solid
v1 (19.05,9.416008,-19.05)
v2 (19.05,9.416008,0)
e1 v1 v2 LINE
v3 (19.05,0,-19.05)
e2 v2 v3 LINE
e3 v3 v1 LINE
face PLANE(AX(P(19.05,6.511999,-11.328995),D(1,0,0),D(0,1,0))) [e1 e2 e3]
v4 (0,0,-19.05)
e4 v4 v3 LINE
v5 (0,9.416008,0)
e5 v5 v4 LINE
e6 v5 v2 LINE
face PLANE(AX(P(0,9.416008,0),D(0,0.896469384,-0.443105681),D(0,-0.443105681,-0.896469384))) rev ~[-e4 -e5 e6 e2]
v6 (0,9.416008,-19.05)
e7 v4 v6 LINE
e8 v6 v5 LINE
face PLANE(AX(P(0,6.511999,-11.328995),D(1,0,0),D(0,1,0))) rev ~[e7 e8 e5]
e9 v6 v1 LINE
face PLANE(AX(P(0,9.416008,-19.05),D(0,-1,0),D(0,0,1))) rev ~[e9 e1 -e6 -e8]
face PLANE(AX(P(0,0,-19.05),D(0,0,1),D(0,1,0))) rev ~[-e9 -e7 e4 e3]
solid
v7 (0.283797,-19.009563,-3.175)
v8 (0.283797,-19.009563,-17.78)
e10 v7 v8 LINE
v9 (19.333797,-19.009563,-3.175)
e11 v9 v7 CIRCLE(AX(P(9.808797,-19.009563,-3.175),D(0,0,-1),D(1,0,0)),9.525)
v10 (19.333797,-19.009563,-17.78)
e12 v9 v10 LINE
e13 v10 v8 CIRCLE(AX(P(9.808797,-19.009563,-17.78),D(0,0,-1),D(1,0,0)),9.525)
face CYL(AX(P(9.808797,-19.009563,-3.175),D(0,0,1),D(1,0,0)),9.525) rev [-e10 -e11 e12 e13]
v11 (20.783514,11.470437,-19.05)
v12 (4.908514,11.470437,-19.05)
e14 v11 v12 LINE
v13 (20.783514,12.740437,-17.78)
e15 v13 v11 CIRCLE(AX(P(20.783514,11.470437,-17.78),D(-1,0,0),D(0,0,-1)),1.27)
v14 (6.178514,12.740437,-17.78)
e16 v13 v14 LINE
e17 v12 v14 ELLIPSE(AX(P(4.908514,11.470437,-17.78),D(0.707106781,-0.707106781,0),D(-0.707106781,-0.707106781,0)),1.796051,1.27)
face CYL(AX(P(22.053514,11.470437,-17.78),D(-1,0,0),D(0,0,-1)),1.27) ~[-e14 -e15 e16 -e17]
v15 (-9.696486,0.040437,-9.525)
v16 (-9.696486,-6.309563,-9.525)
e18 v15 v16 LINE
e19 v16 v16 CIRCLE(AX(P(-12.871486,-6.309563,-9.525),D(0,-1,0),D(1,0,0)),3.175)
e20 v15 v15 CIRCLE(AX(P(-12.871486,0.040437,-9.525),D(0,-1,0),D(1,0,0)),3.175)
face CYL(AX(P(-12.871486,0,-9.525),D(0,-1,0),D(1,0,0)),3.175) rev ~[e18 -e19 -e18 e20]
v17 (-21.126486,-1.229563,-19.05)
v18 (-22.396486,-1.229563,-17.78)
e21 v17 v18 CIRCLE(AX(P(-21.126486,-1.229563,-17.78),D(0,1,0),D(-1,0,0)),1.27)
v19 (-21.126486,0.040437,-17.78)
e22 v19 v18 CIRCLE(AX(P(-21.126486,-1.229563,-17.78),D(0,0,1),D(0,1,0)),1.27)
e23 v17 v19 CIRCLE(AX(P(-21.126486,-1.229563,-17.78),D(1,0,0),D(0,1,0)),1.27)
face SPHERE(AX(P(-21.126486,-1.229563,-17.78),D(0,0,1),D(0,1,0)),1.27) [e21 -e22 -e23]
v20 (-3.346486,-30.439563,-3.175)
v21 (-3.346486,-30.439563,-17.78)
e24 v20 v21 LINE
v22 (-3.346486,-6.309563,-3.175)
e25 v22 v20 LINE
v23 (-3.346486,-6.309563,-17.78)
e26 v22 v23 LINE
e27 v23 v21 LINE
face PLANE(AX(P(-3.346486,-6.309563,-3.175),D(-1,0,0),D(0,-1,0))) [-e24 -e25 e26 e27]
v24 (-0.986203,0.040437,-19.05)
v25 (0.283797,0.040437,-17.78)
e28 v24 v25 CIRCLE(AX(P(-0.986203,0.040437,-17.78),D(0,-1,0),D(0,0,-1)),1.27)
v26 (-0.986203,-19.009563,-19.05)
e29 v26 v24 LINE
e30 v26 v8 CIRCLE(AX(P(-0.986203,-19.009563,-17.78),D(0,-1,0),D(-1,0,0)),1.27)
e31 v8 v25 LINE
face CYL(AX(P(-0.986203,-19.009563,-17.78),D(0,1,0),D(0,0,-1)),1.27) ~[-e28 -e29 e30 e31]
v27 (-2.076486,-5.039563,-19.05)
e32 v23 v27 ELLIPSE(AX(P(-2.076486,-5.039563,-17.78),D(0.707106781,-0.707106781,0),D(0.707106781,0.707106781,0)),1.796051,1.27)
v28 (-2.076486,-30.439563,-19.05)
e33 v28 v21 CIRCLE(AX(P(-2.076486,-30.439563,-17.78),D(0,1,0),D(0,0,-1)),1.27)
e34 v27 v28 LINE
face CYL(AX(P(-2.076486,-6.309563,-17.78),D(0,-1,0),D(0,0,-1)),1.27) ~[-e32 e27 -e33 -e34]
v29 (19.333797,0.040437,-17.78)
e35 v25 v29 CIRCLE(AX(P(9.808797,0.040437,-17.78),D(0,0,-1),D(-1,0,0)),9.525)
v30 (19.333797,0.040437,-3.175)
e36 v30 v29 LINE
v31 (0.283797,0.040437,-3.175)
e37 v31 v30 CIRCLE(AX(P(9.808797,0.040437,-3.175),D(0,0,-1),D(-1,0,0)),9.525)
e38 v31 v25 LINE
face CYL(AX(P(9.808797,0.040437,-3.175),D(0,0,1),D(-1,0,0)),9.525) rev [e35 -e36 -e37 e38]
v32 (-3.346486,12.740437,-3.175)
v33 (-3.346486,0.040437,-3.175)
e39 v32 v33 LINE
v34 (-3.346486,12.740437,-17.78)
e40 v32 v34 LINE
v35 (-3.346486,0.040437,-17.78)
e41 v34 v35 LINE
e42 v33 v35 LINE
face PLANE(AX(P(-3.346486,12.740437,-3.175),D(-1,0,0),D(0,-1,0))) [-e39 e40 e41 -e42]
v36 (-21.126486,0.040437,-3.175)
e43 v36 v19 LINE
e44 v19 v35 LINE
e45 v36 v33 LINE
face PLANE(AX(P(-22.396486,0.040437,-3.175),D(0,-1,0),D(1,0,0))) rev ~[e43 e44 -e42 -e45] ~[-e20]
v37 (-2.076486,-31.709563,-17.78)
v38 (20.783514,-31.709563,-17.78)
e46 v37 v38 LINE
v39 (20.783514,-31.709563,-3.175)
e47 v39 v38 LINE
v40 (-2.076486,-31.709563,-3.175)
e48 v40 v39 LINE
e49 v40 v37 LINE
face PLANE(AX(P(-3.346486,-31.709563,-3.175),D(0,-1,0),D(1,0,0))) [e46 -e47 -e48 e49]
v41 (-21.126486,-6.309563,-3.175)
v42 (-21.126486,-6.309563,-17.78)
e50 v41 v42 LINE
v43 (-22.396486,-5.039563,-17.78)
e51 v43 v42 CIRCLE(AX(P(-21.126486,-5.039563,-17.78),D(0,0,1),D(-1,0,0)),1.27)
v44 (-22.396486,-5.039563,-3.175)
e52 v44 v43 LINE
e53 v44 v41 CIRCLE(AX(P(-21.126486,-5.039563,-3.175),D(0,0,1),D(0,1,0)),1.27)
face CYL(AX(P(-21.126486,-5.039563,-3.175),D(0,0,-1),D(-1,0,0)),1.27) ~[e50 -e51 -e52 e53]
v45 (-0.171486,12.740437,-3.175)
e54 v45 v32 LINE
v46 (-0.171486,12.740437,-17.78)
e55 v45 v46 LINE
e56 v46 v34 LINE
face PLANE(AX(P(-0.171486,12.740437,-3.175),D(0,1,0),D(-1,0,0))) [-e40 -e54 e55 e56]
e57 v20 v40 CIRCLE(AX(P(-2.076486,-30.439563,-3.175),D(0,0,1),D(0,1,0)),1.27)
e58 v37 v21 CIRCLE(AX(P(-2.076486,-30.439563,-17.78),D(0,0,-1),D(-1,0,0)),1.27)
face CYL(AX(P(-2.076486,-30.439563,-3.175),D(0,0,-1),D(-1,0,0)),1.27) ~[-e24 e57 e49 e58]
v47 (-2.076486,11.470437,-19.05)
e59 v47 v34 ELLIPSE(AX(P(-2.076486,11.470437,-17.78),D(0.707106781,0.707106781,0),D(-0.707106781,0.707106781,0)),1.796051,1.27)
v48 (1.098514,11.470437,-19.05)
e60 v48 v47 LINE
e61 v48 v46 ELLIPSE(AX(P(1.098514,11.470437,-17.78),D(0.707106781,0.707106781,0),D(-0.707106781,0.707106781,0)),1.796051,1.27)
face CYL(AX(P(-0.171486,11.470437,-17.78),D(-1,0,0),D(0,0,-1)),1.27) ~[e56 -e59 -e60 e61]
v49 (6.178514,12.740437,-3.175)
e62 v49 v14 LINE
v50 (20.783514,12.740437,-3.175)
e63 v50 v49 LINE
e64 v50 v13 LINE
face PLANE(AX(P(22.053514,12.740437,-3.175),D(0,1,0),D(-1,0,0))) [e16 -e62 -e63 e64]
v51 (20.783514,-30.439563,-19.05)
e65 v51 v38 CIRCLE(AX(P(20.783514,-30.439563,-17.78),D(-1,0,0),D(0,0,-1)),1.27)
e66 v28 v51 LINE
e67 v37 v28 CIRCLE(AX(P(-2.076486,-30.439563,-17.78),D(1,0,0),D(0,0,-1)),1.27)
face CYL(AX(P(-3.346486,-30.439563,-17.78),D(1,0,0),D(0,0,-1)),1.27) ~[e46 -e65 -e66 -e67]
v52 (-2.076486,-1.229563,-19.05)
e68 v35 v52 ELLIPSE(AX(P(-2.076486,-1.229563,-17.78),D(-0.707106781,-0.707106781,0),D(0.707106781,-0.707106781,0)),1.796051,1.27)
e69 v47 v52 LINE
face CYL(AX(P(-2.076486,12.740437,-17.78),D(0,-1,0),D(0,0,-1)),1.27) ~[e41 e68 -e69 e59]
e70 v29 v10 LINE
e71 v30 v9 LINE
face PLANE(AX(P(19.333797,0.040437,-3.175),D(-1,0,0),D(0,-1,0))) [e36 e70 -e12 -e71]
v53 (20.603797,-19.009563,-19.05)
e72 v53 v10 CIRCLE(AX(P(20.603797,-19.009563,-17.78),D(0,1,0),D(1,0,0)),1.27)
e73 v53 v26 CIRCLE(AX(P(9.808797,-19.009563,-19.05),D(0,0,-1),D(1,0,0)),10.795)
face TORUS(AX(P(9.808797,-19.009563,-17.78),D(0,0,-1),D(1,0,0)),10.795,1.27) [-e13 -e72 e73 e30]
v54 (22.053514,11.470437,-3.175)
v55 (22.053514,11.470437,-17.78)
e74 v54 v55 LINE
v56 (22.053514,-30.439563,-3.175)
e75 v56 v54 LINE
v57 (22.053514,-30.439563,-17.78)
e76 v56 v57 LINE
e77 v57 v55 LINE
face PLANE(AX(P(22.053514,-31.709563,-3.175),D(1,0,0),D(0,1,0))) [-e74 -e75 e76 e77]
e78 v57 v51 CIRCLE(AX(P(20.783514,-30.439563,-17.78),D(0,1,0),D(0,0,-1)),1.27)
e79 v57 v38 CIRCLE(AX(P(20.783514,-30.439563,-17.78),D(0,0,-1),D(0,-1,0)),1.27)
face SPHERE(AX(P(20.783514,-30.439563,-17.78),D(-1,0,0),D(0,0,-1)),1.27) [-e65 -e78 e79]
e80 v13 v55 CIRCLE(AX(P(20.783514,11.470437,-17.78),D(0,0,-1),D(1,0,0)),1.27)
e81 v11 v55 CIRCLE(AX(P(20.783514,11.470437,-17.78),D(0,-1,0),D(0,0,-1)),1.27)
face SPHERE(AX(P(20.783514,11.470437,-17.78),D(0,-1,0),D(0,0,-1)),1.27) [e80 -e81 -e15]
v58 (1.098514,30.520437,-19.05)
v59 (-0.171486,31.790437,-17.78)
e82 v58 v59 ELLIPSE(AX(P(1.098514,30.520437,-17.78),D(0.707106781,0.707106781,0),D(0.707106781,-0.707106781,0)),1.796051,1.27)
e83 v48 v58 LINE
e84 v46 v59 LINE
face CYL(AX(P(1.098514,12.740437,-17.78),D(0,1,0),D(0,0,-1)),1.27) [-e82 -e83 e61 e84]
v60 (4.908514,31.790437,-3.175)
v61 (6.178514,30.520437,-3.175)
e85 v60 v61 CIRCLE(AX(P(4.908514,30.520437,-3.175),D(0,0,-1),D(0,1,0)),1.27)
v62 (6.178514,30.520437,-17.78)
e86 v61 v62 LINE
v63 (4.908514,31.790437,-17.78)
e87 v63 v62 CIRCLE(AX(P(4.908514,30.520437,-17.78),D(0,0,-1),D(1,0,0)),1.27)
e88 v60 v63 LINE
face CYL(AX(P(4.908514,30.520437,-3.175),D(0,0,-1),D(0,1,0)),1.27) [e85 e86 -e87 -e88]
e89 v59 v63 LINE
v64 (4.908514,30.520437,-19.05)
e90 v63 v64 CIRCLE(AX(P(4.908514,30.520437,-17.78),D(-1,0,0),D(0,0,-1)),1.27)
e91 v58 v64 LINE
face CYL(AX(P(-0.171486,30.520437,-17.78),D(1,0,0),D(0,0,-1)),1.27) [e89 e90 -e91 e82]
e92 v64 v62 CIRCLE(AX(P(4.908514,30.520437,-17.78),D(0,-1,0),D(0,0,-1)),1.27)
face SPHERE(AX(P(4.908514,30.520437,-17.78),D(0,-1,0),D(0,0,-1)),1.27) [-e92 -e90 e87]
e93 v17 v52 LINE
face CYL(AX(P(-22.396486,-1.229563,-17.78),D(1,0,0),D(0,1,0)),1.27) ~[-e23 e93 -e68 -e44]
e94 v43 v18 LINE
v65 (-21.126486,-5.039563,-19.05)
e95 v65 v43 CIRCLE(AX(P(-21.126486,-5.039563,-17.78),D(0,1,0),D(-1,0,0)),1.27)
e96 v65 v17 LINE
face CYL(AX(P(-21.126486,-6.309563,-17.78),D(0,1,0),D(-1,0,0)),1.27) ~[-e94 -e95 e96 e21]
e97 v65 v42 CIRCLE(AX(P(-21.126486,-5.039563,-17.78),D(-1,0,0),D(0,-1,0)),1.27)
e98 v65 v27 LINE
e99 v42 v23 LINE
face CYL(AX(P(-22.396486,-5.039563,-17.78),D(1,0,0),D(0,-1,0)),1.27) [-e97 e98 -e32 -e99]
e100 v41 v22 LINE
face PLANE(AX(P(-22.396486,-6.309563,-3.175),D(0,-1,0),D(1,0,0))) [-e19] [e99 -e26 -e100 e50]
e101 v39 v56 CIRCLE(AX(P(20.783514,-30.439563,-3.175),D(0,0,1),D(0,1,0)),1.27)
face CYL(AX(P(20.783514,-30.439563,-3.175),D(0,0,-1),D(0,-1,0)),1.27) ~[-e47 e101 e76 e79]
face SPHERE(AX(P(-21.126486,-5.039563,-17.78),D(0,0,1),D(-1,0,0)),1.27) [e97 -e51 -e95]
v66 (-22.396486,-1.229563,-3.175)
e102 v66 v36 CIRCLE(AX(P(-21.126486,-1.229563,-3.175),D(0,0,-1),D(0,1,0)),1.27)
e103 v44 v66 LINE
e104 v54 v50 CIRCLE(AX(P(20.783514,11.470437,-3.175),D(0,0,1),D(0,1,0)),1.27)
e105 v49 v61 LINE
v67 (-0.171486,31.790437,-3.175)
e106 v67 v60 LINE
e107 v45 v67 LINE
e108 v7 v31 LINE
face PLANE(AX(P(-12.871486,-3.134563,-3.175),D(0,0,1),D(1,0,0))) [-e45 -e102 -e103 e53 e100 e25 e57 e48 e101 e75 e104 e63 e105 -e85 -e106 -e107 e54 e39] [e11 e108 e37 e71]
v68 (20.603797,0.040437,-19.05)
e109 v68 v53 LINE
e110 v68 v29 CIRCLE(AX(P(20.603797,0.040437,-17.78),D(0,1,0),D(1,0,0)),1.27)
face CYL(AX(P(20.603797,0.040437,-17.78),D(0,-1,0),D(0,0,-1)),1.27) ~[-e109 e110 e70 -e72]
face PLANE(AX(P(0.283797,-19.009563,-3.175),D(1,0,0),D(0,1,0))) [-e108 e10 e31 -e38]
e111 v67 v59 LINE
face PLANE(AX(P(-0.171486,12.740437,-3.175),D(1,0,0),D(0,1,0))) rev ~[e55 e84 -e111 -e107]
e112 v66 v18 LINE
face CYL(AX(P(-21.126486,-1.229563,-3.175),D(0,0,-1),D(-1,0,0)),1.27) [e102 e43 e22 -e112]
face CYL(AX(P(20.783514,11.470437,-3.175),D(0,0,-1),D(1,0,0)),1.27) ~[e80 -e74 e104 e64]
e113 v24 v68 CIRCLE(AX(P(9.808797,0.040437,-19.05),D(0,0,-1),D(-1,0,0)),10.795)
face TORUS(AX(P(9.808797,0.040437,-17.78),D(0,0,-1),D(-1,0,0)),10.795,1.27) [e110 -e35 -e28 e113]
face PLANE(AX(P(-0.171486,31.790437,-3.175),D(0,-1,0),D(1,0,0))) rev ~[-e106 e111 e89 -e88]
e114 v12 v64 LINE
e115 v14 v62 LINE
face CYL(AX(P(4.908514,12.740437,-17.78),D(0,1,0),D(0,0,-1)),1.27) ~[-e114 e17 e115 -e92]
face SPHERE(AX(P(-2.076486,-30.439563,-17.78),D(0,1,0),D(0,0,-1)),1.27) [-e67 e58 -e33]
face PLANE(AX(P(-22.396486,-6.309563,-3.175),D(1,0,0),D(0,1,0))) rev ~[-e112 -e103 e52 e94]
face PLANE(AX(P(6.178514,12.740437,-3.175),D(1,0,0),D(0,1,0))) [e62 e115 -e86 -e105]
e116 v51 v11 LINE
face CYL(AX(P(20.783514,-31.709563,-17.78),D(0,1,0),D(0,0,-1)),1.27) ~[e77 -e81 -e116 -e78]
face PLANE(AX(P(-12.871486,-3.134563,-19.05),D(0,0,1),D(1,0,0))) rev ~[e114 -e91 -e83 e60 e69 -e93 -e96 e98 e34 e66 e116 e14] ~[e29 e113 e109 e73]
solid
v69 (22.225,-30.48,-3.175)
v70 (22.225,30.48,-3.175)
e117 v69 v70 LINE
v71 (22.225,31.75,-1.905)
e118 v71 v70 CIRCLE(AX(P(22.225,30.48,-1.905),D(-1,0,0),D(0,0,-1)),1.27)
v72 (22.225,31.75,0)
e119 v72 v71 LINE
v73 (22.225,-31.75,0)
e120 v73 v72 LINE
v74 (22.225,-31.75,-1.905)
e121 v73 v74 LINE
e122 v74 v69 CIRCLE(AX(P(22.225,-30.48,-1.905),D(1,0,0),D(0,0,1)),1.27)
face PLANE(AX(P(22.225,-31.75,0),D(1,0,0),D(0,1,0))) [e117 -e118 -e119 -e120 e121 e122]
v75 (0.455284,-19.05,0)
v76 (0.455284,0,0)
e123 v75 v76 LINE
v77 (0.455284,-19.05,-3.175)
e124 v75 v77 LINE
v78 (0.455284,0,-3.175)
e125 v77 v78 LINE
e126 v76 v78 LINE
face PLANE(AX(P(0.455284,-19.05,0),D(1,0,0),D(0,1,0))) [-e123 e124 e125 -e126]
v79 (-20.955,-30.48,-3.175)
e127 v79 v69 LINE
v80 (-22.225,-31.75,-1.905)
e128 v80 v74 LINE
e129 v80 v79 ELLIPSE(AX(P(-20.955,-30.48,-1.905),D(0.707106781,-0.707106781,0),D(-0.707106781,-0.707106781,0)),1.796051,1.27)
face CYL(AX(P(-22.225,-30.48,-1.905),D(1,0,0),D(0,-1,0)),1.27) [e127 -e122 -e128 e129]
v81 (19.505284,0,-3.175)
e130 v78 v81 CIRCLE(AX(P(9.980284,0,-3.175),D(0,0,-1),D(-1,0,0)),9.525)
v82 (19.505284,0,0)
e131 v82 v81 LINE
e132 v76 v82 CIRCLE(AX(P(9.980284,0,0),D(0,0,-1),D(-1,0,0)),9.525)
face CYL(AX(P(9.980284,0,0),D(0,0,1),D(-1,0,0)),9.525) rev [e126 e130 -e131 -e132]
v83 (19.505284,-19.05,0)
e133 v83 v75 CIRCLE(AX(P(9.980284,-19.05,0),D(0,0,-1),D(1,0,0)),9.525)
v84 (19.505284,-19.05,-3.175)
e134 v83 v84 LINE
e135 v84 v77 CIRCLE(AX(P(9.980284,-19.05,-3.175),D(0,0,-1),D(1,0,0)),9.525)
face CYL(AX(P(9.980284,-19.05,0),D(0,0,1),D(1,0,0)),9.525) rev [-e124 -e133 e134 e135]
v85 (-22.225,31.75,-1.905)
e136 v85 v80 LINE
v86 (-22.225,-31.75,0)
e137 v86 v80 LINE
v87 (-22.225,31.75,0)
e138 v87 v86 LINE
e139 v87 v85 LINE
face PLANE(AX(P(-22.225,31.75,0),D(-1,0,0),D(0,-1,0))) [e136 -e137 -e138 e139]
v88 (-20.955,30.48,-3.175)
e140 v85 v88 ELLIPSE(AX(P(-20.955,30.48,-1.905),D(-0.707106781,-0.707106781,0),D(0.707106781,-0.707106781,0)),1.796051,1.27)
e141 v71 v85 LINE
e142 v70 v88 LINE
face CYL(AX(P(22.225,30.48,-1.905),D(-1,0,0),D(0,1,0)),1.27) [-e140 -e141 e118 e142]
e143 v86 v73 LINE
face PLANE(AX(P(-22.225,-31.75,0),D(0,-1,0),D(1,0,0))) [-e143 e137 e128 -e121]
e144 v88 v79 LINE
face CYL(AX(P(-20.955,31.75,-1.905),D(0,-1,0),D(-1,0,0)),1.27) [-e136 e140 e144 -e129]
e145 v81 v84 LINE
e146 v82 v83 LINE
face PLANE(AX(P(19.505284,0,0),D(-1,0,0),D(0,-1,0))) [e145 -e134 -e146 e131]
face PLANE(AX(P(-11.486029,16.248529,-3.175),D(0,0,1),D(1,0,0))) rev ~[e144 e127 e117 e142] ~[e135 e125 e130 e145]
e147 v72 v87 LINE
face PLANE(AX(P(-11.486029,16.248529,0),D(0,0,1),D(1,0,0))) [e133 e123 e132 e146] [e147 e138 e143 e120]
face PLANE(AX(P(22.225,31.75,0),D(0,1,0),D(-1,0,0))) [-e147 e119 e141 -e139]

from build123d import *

# Parameters (mm, degrees)
F2_W     = 19.05
F2_H     = 25.4
F2_W_2   = 15.875
F2_H_2   = 19.05
F2_H_3   = 6.35
F2_W_3   = 6.35
F3_DEPTH = 3.175
F1_W     = 19.05
F1_H     = 6.35
F1_W_2   = 6.35
F1_H_2   = 19.05
F4_DEPTH = 15.875
F5_R     = 3.175
F6_DEPTH = 12.7
F9_DEPTH = 19.05
F10_R    = 1.27
F10_2_R  = 1.27


# Not quite as in the source:
# - a feature of the source that left no trace in its solid (it failed there, or was rolled back) is left out


with BuildPart() as f3:
    # F2 (on Top) → F3 (new body)
    with BuildSketch(Plane.XY):
        Polygon((0, 31.75), (-22.225, 31.75), (-22.225, 0), (-3.175, 0), (-3.175, 12.7), (0, 12.7), align=None)
        with Locations((-12.7, -19.05)):
            Rectangle(F2_W, F2_H)
        with Locations((14.2875, 22.225)):
            Rectangle(F2_W_2, F2_H_2)
        with Locations((-12.7, -3.175)):
            Rectangle(F2_W, F2_H_3)
        with Locations((3.175, 22.225)):
            Rectangle(F2_W_3, F2_H_2)
        Polygon((6.35, 12.7), (0, 12.7), (-3.175, 12.7), (-3.175, 0), (-3.175, -6.35), (-3.175, -31.75), (22.225, -31.75), (22.225, 12.7), align=None)
        with BuildLine():
            ThreePointArc((0.4552836776, 0), (9.9802836776, 9.525), (19.5052836776, 0))
            Line((19.5052836776, 0), (19.5052836776, -9.525))
            Line((19.5052836776, -9.525), (19.5052836776, -19.05))
            ThreePointArc((19.5052836776, -19.05), (9.9802836776, -28.575), (0.4552836776, -19.05))
            Line((0.4552836776, -19.05), (0.4552836776, -9.525))
            Line((0.4552836776, -9.525), (0.4552836776, 0))
        make_face(mode=Mode.SUBTRACT)
    extrude(amount=-F3_DEPTH)

    # F10
    f10_edges = [f3.edges().sort_by_distance(p)[0] for p in [
        (-22.225, 0, -3.175),
        (0, -31.75, -3.175),
        (0, 31.75, -3.175),
    ]]
    fillet(f10_edges, radius=F10_R)


with BuildPart() as f4:
    # F1 (on offset) → F4 (new body)
    with BuildSketch(Plane.XY.offset(-3.175)):
        with Locations((-12.8714862525, -3.1345629871)):
            Rectangle(F1_W, F1_H)
        with Locations((3.0035137475, 22.2654370129)):
            Rectangle(F1_W_2, F1_H_2)
        Polygon((6.1785137475, 12.7404370129), (-0.1714862525, 12.7404370129), (-3.3464862525, 12.7404370129), (-3.3464862525, 0.0404370129), (-3.3464862525, -6.3095629871), (-3.3464862525, -31.7095629871), (22.0535137475, -31.7095629871), (22.0535137475, 12.7404370129), align=None)
        with BuildLine():
            ThreePointArc((0.283797425, 0.0404370129), (9.808797425, 9.5654370129), (19.333797425, 0.0404370129))
            Line((19.333797425, 0.0404370129), (19.333797425, -9.4845629871))
            Line((19.333797425, -9.4845629871), (19.333797425, -19.0095629871))
            ThreePointArc((19.333797425, -19.0095629871), (9.808797425, -28.5345629871), (0.283797425, -19.0095629871))
            Line((0.283797425, -19.0095629871), (0.283797425, -9.4845629871))
            Line((0.283797425, -9.4845629871), (0.283797425, 0.0404370129))
        make_face(mode=Mode.SUBTRACT)
    extrude(amount=-F4_DEPTH)

    # F5 (on Front) → F6 (cut, symmetric)
    with BuildSketch(Plane.XZ):
        with Locations((-12.8714862525, -9.525)):
            Circle(F5_R)
    extrude(amount=F6_DEPTH, both=True, mode=Mode.SUBTRACT)

    # F10#2
    f10_2_edges = [f4.edges().sort_by_distance(p)[0] for p in [
        (-22.396486, -6.309563, -11.1125),
        (-22.396486, 0.040437, -11.1125),
        (-12.871486, 0.040437, -19.05),
        (-22.396486, -3.134563, -19.05),
        (-12.871486, -6.309563, -19.05),
        (-3.346486, -19.009563, -19.05),
        (9.353514, -31.709563, -19.05),
        (22.053514, -9.484563, -19.05),
        (14.116014, 12.740437, -19.05),
        (6.178514, 22.265437, -19.05),
        (3.003514, 31.790437, -19.05),
        (-0.171486, 22.265437, -19.05),
        (-1.758986, 12.740437, -19.05),
        (-3.346486, 6.390437, -19.05),
        (9.808797, -28.534563, -19.05),
        (0.283797, -9.484563, -19.05),
        (9.808797, 9.565437, -19.05),
        (19.333797, -9.484563, -19.05),
        (-3.346486, -31.709563, -11.1125),
        (22.053514, -31.709563, -11.1125),
        (22.053514, 12.740437, -11.1125),
        (6.178514, 31.790437, -11.1125),
    ]]
    fillet(f10_2_edges, radius=F10_2_R)


with BuildPart() as f9:
    # F7 (on Right) → F9 (new body)
    with BuildSketch(Plane.YZ):
        Polygon((9.4160083681, -19.05), (9.4160083681, 0), (0, -19.05), align=None)
    extrude(amount=F9_DEPTH)


solid = Compound([f3.part, f4.part, f9.part])
